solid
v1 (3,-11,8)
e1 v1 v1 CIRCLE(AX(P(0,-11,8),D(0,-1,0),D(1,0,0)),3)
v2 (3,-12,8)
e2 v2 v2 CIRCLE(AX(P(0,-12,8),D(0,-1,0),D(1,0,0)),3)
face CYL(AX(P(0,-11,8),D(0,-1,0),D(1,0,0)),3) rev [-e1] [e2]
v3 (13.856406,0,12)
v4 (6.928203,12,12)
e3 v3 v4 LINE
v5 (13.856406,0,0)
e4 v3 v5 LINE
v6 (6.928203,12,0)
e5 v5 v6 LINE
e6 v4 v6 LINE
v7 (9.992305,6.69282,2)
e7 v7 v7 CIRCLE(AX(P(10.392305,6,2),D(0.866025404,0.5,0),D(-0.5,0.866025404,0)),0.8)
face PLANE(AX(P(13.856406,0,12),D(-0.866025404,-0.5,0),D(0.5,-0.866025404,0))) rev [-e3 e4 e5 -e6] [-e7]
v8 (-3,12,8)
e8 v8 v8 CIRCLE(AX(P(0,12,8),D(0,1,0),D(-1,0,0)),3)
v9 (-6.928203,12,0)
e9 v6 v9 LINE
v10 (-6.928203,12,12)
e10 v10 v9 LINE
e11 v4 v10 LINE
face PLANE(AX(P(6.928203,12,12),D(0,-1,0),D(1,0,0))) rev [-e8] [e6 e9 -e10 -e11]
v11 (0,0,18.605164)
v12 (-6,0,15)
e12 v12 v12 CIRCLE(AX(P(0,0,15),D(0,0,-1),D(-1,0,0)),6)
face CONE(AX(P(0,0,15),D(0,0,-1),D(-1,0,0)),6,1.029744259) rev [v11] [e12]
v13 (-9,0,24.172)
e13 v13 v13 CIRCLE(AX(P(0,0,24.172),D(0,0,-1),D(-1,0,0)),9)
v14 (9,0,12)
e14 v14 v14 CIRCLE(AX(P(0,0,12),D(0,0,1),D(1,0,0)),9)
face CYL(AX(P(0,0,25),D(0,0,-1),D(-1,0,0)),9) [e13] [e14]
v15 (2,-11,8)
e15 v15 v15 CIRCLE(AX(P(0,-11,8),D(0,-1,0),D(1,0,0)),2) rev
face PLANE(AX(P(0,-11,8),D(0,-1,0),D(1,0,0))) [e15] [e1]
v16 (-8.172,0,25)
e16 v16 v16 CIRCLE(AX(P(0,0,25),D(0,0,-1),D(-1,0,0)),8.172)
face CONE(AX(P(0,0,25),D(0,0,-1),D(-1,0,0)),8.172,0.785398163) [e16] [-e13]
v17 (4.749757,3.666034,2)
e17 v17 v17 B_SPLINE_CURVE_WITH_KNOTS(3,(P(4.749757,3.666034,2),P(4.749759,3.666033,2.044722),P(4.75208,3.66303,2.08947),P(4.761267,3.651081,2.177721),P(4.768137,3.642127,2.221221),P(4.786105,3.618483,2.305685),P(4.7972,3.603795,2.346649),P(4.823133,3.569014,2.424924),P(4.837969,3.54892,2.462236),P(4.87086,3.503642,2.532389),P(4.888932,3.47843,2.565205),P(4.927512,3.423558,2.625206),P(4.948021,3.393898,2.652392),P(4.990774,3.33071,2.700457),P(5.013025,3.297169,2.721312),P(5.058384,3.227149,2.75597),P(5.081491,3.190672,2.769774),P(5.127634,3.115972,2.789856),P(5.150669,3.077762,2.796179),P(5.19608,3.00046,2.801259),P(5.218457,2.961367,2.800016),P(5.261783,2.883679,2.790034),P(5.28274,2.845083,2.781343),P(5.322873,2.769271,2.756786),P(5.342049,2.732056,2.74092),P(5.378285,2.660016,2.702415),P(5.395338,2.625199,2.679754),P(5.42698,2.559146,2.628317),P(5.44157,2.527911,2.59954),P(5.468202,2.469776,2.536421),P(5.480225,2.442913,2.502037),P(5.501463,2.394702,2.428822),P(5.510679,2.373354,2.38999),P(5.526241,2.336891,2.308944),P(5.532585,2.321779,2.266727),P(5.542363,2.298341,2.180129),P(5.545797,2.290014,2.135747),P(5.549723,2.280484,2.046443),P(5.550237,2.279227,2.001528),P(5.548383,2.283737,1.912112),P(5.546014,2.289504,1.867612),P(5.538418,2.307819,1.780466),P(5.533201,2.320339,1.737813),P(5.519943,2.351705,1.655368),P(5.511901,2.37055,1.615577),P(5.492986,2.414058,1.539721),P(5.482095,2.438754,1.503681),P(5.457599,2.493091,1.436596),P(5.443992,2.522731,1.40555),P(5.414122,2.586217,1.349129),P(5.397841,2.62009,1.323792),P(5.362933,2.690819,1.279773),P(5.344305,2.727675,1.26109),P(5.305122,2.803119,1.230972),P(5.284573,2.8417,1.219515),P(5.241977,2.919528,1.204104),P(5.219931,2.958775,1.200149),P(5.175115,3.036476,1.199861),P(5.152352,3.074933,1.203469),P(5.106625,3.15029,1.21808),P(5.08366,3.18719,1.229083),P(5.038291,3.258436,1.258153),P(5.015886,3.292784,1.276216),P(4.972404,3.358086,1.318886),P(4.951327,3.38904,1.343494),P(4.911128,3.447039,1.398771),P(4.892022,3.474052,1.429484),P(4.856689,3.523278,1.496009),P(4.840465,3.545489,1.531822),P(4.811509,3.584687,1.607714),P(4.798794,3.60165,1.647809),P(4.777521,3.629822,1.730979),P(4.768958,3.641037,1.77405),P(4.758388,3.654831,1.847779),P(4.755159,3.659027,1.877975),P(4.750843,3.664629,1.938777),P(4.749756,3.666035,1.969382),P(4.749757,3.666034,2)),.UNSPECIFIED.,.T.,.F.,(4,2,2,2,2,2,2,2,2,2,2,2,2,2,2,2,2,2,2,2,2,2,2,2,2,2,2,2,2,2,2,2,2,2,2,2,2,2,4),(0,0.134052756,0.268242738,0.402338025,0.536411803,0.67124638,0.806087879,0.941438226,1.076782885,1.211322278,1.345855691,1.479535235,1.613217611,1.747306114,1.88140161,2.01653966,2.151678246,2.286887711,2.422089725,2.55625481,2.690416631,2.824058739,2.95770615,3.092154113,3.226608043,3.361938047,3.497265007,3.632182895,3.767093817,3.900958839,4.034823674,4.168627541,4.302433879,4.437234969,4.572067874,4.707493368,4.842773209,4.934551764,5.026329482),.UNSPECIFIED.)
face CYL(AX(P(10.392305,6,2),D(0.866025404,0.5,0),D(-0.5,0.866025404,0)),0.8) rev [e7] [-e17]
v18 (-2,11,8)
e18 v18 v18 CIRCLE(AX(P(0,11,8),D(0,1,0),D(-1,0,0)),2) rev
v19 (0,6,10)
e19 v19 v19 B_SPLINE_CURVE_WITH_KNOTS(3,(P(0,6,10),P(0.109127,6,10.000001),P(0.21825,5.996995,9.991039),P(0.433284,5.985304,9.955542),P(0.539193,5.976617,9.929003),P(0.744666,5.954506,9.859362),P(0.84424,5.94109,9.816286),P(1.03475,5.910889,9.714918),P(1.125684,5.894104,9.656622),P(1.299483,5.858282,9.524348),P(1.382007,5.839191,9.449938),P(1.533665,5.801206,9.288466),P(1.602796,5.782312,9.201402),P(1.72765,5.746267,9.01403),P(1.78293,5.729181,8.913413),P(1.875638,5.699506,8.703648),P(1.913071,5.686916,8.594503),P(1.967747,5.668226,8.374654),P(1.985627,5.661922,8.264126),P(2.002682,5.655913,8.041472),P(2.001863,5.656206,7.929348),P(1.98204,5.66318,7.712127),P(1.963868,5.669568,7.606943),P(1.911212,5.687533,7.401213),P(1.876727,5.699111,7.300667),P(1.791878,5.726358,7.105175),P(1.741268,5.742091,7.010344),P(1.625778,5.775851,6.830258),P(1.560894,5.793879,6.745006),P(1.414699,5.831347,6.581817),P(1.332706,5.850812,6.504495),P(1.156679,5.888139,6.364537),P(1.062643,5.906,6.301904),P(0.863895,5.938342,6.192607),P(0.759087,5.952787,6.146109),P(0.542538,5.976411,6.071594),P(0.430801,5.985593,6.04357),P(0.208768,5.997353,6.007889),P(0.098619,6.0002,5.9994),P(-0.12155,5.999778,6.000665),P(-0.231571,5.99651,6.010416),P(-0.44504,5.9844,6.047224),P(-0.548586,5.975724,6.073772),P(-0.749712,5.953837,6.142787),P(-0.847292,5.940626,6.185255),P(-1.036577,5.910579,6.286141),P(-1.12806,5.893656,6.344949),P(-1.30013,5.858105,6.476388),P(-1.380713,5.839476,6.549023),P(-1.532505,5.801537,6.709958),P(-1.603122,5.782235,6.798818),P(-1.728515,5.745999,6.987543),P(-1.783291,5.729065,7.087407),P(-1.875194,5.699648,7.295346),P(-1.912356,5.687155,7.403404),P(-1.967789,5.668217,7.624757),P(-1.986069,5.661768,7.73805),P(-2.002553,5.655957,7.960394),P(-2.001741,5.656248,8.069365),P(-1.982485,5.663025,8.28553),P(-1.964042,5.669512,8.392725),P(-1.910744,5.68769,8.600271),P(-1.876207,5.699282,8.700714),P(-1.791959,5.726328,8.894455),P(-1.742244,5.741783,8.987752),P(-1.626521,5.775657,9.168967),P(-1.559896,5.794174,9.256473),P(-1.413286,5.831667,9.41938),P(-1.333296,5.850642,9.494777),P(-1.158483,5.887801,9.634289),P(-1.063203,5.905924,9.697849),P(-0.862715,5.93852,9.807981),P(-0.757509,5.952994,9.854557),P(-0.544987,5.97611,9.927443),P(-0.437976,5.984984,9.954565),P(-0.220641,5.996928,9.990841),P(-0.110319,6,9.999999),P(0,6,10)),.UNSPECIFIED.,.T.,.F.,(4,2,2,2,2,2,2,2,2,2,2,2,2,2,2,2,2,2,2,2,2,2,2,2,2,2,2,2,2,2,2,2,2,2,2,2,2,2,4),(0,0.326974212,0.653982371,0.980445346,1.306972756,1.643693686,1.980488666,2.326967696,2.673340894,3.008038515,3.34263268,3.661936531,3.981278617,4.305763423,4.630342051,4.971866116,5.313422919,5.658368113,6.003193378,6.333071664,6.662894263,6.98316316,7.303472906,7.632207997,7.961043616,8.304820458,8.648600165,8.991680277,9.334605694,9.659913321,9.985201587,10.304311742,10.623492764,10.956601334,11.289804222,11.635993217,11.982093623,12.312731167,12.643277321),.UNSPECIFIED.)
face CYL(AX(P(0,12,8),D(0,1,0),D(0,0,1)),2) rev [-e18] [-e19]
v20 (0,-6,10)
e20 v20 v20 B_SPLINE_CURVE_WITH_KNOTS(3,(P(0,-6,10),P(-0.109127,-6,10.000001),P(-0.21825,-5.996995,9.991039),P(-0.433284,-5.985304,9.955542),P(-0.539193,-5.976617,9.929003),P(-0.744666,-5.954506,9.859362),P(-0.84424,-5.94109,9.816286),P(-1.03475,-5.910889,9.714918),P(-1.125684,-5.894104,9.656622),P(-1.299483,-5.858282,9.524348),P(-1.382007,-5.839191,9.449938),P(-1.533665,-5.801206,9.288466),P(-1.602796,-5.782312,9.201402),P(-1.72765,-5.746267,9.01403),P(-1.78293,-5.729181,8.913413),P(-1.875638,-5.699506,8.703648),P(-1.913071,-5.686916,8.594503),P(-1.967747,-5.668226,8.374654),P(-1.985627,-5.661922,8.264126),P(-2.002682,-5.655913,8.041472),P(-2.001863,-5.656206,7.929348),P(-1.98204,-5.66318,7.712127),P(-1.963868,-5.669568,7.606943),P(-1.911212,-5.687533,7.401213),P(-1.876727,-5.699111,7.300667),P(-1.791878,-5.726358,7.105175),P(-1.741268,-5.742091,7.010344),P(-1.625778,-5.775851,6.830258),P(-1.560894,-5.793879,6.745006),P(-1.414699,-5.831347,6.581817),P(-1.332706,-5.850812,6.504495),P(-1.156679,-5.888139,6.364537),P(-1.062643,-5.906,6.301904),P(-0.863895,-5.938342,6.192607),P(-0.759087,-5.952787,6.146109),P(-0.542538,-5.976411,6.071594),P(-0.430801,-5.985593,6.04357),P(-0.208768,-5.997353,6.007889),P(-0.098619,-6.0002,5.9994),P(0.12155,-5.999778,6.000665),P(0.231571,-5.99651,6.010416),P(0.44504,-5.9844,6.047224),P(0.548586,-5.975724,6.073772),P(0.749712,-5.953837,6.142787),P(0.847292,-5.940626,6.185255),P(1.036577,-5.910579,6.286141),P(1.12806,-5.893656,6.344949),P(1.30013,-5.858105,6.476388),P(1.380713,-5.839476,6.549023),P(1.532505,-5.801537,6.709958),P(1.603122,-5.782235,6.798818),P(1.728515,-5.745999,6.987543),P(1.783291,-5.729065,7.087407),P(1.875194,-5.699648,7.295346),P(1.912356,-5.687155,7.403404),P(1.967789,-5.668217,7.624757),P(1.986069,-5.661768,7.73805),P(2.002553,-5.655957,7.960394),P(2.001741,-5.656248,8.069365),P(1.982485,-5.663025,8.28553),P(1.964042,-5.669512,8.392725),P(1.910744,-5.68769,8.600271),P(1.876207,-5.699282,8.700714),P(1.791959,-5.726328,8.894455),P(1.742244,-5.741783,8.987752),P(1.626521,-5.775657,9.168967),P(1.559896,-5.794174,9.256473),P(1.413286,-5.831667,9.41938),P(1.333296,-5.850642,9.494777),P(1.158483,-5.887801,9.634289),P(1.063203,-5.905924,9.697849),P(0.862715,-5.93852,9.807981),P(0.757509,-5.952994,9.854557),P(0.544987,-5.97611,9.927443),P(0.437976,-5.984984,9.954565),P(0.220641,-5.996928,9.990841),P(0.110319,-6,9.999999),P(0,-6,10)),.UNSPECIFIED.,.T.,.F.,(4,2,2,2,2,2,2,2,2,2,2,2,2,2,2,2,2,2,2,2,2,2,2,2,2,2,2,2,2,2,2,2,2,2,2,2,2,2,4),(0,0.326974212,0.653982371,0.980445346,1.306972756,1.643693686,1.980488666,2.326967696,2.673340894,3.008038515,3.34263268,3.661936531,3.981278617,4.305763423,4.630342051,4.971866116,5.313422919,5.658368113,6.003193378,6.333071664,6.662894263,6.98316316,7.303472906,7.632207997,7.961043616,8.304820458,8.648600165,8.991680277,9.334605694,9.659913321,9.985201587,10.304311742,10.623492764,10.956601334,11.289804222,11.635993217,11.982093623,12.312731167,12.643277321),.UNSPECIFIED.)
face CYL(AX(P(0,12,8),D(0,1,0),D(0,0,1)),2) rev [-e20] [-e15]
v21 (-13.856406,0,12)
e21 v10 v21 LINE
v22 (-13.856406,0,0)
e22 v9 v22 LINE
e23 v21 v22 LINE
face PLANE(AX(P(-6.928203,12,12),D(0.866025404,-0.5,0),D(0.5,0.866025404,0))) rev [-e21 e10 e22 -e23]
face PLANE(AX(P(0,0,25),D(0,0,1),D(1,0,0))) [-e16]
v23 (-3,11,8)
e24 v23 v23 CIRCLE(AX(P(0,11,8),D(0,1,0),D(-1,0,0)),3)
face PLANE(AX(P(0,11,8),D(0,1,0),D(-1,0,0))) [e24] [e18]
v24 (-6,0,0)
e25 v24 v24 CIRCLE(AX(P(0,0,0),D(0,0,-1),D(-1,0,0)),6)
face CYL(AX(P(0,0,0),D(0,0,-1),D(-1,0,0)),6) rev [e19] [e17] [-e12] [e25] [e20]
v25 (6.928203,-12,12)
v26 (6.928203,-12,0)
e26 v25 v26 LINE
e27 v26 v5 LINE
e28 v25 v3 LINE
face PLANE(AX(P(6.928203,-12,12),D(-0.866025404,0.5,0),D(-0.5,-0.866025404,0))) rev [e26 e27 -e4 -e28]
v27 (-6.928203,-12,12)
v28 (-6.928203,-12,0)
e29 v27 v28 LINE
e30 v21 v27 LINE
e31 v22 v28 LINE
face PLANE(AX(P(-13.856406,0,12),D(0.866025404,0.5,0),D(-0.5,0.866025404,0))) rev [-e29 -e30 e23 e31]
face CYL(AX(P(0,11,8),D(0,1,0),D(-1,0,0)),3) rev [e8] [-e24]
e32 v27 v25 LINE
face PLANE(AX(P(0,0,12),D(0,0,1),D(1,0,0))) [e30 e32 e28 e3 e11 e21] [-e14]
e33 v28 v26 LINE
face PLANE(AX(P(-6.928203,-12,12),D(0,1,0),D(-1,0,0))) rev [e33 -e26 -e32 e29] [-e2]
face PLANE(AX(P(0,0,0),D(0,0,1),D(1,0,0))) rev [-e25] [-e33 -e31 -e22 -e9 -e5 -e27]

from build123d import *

# Parameters (mm, degrees)
BOSS_EXTRUDE1_DEPTH        = 12
SKETCH2_R                  = 10
BOSS_EXTRUDE2_DEPTH        = 13
F_12_0MM_DOWEL_HOLE1_D     = 12
F_12_0MM_DOWEL_HOLE1_DEPTH = 15
F_12_0MM_DOWEL_HOLE1_TIP   = 3.605163714
F_4_0MM_DOWEL_HOLE1_D      = 4
M2X0_4_TAPPED_HOLE1_REACH  = 41.205
M2X0_4_TAPPED_HOLE1_BORE_R = 0.8
SKETCH11_R                 = 3
CUT_EXTRUDE1_DEPTH         = 1
CIRPATTERN1_COUNT          = 2
CUT_EXTRUDE2_START         = -3
SKETCH13_R                 = 10.893382682
SKETCH13_R_2               = 9
CUT_EXTRUDE2_DEPTH         = 3


# Read off the part's stored shape, not the designer's step: M18x1.5 Machine Threads Stud1
with BuildPart() as part:
    # Sketch1 → Boss-Extrude1 (new body)
    with BuildSketch(Plane.XY):
        Polygon((6.92820323, 12), (-6.92820323, 12), (-13.856406461, 0), (-6.92820323, -12), (6.92820323, -12), (13.856406461, 0), align=None)
    extrude(amount=BOSS_EXTRUDE1_DEPTH)

    # Sketch2 → Boss-Extrude2 (add)
    with BuildSketch(Plane.XY.offset(12)):
        with Locations(Location((0, 0, 0), (0, 0, 180))):
            Circle(SKETCH2_R)
    extrude(amount=BOSS_EXTRUDE2_DEPTH)

    # Ø12.0mm Dowel Hole1
    with Locations(Plane(origin=(0, 0, 0), x_dir=(-1, 0, 0), z_dir=(0, 0, -1))):
        with Locations((0, 0)):
            Hole(F_12_0MM_DOWEL_HOLE1_D / 2, depth=F_12_0MM_DOWEL_HOLE1_DEPTH)
            with Locations((0, 0, -(F_12_0MM_DOWEL_HOLE1_DEPTH + F_12_0MM_DOWEL_HOLE1_TIP / 2))):  # 118° drill point
                Cone(0, F_12_0MM_DOWEL_HOLE1_D / 2, F_12_0MM_DOWEL_HOLE1_TIP, mode=Mode.SUBTRACT)

    # Ø4.0mm Dowel Hole1 (through all)
    with Locations(Plane(origin=(0, 12, 0), x_dir=(1, 0, 0), z_dir=(0, 1, 0))):
        with Locations((0, -8)):
            Hole(F_4_0MM_DOWEL_HOLE1_D / 2)

    # M2x0.4 Tapped Hole1 bore → M2x0.4 Tapped Hole1 (cut, up to next)
    with BuildSketch(Plane(origin=(10.392304845, 6, 0), x_dir=(0, 0, -1), z_dir=(0.8660254037844387, 0.49999999999999994, 0)), mode=Mode.PRIVATE) as m2x0_4_tapped_hole1_sk1:
        with Locations((-2, 0)):
            Circle(M2X0_4_TAPPED_HOLE1_BORE_R)
    m2x0_4_tapped_hole1_tool1 = extrude(m2x0_4_tapped_hole1_sk1.sketch, amount=-M2X0_4_TAPPED_HOLE1_REACH, mode=Mode.PRIVATE) & part.part
    add(m2x0_4_tapped_hole1_tool1.solids().sort_by_distance((10.392305, 6, 2))[0], mode=Mode.SUBTRACT)

    # Sketch11 → Cut-Extrude1 (cut)
    with BuildSketch(Plane.XZ.offset(12)):
        with Locations((0, 8)):
            Circle(SKETCH11_R)
    cut_extrude1 = extrude(amount=-CUT_EXTRUDE1_DEPTH, mode=Mode.SUBTRACT)

    # CirPattern1: Cut-Extrude1 ×2 about axis
    cirpattern1_axis = Axis((0, 0, 25), (0, 0, -1))
    for i in range(1, CIRPATTERN1_COUNT):
        add(cut_extrude1.rotate(cirpattern1_axis, i * 360 / CIRPATTERN1_COUNT), mode=Mode.SUBTRACT)

    # M18x1.5 Machine Threads Stud1 outline → M18x1.5 Machine Threads Stud1 (revolve, cut)
    with BuildSketch(Plane.XZ):
        Polygon((10, 25), (8.172, 25), (9, 24.172), (9, 15), (10, 15), align=None)
    revolve(axis=Axis((0, 0, 0), (0, 0, 1)), mode=Mode.SUBTRACT)

    # Sketch13 → Cut-Extrude2 (cut)
    with BuildSketch(Plane.XY.offset(15).offset(CUT_EXTRUDE2_START)):
        Circle(SKETCH13_R)
        with Locations(Location((0, 0, 0), (0, 0, 180))):
            Circle(SKETCH13_R_2, mode=Mode.SUBTRACT)
    extrude(amount=CUT_EXTRUDE2_DEPTH, mode=Mode.SUBTRACT)


solid = part.part
